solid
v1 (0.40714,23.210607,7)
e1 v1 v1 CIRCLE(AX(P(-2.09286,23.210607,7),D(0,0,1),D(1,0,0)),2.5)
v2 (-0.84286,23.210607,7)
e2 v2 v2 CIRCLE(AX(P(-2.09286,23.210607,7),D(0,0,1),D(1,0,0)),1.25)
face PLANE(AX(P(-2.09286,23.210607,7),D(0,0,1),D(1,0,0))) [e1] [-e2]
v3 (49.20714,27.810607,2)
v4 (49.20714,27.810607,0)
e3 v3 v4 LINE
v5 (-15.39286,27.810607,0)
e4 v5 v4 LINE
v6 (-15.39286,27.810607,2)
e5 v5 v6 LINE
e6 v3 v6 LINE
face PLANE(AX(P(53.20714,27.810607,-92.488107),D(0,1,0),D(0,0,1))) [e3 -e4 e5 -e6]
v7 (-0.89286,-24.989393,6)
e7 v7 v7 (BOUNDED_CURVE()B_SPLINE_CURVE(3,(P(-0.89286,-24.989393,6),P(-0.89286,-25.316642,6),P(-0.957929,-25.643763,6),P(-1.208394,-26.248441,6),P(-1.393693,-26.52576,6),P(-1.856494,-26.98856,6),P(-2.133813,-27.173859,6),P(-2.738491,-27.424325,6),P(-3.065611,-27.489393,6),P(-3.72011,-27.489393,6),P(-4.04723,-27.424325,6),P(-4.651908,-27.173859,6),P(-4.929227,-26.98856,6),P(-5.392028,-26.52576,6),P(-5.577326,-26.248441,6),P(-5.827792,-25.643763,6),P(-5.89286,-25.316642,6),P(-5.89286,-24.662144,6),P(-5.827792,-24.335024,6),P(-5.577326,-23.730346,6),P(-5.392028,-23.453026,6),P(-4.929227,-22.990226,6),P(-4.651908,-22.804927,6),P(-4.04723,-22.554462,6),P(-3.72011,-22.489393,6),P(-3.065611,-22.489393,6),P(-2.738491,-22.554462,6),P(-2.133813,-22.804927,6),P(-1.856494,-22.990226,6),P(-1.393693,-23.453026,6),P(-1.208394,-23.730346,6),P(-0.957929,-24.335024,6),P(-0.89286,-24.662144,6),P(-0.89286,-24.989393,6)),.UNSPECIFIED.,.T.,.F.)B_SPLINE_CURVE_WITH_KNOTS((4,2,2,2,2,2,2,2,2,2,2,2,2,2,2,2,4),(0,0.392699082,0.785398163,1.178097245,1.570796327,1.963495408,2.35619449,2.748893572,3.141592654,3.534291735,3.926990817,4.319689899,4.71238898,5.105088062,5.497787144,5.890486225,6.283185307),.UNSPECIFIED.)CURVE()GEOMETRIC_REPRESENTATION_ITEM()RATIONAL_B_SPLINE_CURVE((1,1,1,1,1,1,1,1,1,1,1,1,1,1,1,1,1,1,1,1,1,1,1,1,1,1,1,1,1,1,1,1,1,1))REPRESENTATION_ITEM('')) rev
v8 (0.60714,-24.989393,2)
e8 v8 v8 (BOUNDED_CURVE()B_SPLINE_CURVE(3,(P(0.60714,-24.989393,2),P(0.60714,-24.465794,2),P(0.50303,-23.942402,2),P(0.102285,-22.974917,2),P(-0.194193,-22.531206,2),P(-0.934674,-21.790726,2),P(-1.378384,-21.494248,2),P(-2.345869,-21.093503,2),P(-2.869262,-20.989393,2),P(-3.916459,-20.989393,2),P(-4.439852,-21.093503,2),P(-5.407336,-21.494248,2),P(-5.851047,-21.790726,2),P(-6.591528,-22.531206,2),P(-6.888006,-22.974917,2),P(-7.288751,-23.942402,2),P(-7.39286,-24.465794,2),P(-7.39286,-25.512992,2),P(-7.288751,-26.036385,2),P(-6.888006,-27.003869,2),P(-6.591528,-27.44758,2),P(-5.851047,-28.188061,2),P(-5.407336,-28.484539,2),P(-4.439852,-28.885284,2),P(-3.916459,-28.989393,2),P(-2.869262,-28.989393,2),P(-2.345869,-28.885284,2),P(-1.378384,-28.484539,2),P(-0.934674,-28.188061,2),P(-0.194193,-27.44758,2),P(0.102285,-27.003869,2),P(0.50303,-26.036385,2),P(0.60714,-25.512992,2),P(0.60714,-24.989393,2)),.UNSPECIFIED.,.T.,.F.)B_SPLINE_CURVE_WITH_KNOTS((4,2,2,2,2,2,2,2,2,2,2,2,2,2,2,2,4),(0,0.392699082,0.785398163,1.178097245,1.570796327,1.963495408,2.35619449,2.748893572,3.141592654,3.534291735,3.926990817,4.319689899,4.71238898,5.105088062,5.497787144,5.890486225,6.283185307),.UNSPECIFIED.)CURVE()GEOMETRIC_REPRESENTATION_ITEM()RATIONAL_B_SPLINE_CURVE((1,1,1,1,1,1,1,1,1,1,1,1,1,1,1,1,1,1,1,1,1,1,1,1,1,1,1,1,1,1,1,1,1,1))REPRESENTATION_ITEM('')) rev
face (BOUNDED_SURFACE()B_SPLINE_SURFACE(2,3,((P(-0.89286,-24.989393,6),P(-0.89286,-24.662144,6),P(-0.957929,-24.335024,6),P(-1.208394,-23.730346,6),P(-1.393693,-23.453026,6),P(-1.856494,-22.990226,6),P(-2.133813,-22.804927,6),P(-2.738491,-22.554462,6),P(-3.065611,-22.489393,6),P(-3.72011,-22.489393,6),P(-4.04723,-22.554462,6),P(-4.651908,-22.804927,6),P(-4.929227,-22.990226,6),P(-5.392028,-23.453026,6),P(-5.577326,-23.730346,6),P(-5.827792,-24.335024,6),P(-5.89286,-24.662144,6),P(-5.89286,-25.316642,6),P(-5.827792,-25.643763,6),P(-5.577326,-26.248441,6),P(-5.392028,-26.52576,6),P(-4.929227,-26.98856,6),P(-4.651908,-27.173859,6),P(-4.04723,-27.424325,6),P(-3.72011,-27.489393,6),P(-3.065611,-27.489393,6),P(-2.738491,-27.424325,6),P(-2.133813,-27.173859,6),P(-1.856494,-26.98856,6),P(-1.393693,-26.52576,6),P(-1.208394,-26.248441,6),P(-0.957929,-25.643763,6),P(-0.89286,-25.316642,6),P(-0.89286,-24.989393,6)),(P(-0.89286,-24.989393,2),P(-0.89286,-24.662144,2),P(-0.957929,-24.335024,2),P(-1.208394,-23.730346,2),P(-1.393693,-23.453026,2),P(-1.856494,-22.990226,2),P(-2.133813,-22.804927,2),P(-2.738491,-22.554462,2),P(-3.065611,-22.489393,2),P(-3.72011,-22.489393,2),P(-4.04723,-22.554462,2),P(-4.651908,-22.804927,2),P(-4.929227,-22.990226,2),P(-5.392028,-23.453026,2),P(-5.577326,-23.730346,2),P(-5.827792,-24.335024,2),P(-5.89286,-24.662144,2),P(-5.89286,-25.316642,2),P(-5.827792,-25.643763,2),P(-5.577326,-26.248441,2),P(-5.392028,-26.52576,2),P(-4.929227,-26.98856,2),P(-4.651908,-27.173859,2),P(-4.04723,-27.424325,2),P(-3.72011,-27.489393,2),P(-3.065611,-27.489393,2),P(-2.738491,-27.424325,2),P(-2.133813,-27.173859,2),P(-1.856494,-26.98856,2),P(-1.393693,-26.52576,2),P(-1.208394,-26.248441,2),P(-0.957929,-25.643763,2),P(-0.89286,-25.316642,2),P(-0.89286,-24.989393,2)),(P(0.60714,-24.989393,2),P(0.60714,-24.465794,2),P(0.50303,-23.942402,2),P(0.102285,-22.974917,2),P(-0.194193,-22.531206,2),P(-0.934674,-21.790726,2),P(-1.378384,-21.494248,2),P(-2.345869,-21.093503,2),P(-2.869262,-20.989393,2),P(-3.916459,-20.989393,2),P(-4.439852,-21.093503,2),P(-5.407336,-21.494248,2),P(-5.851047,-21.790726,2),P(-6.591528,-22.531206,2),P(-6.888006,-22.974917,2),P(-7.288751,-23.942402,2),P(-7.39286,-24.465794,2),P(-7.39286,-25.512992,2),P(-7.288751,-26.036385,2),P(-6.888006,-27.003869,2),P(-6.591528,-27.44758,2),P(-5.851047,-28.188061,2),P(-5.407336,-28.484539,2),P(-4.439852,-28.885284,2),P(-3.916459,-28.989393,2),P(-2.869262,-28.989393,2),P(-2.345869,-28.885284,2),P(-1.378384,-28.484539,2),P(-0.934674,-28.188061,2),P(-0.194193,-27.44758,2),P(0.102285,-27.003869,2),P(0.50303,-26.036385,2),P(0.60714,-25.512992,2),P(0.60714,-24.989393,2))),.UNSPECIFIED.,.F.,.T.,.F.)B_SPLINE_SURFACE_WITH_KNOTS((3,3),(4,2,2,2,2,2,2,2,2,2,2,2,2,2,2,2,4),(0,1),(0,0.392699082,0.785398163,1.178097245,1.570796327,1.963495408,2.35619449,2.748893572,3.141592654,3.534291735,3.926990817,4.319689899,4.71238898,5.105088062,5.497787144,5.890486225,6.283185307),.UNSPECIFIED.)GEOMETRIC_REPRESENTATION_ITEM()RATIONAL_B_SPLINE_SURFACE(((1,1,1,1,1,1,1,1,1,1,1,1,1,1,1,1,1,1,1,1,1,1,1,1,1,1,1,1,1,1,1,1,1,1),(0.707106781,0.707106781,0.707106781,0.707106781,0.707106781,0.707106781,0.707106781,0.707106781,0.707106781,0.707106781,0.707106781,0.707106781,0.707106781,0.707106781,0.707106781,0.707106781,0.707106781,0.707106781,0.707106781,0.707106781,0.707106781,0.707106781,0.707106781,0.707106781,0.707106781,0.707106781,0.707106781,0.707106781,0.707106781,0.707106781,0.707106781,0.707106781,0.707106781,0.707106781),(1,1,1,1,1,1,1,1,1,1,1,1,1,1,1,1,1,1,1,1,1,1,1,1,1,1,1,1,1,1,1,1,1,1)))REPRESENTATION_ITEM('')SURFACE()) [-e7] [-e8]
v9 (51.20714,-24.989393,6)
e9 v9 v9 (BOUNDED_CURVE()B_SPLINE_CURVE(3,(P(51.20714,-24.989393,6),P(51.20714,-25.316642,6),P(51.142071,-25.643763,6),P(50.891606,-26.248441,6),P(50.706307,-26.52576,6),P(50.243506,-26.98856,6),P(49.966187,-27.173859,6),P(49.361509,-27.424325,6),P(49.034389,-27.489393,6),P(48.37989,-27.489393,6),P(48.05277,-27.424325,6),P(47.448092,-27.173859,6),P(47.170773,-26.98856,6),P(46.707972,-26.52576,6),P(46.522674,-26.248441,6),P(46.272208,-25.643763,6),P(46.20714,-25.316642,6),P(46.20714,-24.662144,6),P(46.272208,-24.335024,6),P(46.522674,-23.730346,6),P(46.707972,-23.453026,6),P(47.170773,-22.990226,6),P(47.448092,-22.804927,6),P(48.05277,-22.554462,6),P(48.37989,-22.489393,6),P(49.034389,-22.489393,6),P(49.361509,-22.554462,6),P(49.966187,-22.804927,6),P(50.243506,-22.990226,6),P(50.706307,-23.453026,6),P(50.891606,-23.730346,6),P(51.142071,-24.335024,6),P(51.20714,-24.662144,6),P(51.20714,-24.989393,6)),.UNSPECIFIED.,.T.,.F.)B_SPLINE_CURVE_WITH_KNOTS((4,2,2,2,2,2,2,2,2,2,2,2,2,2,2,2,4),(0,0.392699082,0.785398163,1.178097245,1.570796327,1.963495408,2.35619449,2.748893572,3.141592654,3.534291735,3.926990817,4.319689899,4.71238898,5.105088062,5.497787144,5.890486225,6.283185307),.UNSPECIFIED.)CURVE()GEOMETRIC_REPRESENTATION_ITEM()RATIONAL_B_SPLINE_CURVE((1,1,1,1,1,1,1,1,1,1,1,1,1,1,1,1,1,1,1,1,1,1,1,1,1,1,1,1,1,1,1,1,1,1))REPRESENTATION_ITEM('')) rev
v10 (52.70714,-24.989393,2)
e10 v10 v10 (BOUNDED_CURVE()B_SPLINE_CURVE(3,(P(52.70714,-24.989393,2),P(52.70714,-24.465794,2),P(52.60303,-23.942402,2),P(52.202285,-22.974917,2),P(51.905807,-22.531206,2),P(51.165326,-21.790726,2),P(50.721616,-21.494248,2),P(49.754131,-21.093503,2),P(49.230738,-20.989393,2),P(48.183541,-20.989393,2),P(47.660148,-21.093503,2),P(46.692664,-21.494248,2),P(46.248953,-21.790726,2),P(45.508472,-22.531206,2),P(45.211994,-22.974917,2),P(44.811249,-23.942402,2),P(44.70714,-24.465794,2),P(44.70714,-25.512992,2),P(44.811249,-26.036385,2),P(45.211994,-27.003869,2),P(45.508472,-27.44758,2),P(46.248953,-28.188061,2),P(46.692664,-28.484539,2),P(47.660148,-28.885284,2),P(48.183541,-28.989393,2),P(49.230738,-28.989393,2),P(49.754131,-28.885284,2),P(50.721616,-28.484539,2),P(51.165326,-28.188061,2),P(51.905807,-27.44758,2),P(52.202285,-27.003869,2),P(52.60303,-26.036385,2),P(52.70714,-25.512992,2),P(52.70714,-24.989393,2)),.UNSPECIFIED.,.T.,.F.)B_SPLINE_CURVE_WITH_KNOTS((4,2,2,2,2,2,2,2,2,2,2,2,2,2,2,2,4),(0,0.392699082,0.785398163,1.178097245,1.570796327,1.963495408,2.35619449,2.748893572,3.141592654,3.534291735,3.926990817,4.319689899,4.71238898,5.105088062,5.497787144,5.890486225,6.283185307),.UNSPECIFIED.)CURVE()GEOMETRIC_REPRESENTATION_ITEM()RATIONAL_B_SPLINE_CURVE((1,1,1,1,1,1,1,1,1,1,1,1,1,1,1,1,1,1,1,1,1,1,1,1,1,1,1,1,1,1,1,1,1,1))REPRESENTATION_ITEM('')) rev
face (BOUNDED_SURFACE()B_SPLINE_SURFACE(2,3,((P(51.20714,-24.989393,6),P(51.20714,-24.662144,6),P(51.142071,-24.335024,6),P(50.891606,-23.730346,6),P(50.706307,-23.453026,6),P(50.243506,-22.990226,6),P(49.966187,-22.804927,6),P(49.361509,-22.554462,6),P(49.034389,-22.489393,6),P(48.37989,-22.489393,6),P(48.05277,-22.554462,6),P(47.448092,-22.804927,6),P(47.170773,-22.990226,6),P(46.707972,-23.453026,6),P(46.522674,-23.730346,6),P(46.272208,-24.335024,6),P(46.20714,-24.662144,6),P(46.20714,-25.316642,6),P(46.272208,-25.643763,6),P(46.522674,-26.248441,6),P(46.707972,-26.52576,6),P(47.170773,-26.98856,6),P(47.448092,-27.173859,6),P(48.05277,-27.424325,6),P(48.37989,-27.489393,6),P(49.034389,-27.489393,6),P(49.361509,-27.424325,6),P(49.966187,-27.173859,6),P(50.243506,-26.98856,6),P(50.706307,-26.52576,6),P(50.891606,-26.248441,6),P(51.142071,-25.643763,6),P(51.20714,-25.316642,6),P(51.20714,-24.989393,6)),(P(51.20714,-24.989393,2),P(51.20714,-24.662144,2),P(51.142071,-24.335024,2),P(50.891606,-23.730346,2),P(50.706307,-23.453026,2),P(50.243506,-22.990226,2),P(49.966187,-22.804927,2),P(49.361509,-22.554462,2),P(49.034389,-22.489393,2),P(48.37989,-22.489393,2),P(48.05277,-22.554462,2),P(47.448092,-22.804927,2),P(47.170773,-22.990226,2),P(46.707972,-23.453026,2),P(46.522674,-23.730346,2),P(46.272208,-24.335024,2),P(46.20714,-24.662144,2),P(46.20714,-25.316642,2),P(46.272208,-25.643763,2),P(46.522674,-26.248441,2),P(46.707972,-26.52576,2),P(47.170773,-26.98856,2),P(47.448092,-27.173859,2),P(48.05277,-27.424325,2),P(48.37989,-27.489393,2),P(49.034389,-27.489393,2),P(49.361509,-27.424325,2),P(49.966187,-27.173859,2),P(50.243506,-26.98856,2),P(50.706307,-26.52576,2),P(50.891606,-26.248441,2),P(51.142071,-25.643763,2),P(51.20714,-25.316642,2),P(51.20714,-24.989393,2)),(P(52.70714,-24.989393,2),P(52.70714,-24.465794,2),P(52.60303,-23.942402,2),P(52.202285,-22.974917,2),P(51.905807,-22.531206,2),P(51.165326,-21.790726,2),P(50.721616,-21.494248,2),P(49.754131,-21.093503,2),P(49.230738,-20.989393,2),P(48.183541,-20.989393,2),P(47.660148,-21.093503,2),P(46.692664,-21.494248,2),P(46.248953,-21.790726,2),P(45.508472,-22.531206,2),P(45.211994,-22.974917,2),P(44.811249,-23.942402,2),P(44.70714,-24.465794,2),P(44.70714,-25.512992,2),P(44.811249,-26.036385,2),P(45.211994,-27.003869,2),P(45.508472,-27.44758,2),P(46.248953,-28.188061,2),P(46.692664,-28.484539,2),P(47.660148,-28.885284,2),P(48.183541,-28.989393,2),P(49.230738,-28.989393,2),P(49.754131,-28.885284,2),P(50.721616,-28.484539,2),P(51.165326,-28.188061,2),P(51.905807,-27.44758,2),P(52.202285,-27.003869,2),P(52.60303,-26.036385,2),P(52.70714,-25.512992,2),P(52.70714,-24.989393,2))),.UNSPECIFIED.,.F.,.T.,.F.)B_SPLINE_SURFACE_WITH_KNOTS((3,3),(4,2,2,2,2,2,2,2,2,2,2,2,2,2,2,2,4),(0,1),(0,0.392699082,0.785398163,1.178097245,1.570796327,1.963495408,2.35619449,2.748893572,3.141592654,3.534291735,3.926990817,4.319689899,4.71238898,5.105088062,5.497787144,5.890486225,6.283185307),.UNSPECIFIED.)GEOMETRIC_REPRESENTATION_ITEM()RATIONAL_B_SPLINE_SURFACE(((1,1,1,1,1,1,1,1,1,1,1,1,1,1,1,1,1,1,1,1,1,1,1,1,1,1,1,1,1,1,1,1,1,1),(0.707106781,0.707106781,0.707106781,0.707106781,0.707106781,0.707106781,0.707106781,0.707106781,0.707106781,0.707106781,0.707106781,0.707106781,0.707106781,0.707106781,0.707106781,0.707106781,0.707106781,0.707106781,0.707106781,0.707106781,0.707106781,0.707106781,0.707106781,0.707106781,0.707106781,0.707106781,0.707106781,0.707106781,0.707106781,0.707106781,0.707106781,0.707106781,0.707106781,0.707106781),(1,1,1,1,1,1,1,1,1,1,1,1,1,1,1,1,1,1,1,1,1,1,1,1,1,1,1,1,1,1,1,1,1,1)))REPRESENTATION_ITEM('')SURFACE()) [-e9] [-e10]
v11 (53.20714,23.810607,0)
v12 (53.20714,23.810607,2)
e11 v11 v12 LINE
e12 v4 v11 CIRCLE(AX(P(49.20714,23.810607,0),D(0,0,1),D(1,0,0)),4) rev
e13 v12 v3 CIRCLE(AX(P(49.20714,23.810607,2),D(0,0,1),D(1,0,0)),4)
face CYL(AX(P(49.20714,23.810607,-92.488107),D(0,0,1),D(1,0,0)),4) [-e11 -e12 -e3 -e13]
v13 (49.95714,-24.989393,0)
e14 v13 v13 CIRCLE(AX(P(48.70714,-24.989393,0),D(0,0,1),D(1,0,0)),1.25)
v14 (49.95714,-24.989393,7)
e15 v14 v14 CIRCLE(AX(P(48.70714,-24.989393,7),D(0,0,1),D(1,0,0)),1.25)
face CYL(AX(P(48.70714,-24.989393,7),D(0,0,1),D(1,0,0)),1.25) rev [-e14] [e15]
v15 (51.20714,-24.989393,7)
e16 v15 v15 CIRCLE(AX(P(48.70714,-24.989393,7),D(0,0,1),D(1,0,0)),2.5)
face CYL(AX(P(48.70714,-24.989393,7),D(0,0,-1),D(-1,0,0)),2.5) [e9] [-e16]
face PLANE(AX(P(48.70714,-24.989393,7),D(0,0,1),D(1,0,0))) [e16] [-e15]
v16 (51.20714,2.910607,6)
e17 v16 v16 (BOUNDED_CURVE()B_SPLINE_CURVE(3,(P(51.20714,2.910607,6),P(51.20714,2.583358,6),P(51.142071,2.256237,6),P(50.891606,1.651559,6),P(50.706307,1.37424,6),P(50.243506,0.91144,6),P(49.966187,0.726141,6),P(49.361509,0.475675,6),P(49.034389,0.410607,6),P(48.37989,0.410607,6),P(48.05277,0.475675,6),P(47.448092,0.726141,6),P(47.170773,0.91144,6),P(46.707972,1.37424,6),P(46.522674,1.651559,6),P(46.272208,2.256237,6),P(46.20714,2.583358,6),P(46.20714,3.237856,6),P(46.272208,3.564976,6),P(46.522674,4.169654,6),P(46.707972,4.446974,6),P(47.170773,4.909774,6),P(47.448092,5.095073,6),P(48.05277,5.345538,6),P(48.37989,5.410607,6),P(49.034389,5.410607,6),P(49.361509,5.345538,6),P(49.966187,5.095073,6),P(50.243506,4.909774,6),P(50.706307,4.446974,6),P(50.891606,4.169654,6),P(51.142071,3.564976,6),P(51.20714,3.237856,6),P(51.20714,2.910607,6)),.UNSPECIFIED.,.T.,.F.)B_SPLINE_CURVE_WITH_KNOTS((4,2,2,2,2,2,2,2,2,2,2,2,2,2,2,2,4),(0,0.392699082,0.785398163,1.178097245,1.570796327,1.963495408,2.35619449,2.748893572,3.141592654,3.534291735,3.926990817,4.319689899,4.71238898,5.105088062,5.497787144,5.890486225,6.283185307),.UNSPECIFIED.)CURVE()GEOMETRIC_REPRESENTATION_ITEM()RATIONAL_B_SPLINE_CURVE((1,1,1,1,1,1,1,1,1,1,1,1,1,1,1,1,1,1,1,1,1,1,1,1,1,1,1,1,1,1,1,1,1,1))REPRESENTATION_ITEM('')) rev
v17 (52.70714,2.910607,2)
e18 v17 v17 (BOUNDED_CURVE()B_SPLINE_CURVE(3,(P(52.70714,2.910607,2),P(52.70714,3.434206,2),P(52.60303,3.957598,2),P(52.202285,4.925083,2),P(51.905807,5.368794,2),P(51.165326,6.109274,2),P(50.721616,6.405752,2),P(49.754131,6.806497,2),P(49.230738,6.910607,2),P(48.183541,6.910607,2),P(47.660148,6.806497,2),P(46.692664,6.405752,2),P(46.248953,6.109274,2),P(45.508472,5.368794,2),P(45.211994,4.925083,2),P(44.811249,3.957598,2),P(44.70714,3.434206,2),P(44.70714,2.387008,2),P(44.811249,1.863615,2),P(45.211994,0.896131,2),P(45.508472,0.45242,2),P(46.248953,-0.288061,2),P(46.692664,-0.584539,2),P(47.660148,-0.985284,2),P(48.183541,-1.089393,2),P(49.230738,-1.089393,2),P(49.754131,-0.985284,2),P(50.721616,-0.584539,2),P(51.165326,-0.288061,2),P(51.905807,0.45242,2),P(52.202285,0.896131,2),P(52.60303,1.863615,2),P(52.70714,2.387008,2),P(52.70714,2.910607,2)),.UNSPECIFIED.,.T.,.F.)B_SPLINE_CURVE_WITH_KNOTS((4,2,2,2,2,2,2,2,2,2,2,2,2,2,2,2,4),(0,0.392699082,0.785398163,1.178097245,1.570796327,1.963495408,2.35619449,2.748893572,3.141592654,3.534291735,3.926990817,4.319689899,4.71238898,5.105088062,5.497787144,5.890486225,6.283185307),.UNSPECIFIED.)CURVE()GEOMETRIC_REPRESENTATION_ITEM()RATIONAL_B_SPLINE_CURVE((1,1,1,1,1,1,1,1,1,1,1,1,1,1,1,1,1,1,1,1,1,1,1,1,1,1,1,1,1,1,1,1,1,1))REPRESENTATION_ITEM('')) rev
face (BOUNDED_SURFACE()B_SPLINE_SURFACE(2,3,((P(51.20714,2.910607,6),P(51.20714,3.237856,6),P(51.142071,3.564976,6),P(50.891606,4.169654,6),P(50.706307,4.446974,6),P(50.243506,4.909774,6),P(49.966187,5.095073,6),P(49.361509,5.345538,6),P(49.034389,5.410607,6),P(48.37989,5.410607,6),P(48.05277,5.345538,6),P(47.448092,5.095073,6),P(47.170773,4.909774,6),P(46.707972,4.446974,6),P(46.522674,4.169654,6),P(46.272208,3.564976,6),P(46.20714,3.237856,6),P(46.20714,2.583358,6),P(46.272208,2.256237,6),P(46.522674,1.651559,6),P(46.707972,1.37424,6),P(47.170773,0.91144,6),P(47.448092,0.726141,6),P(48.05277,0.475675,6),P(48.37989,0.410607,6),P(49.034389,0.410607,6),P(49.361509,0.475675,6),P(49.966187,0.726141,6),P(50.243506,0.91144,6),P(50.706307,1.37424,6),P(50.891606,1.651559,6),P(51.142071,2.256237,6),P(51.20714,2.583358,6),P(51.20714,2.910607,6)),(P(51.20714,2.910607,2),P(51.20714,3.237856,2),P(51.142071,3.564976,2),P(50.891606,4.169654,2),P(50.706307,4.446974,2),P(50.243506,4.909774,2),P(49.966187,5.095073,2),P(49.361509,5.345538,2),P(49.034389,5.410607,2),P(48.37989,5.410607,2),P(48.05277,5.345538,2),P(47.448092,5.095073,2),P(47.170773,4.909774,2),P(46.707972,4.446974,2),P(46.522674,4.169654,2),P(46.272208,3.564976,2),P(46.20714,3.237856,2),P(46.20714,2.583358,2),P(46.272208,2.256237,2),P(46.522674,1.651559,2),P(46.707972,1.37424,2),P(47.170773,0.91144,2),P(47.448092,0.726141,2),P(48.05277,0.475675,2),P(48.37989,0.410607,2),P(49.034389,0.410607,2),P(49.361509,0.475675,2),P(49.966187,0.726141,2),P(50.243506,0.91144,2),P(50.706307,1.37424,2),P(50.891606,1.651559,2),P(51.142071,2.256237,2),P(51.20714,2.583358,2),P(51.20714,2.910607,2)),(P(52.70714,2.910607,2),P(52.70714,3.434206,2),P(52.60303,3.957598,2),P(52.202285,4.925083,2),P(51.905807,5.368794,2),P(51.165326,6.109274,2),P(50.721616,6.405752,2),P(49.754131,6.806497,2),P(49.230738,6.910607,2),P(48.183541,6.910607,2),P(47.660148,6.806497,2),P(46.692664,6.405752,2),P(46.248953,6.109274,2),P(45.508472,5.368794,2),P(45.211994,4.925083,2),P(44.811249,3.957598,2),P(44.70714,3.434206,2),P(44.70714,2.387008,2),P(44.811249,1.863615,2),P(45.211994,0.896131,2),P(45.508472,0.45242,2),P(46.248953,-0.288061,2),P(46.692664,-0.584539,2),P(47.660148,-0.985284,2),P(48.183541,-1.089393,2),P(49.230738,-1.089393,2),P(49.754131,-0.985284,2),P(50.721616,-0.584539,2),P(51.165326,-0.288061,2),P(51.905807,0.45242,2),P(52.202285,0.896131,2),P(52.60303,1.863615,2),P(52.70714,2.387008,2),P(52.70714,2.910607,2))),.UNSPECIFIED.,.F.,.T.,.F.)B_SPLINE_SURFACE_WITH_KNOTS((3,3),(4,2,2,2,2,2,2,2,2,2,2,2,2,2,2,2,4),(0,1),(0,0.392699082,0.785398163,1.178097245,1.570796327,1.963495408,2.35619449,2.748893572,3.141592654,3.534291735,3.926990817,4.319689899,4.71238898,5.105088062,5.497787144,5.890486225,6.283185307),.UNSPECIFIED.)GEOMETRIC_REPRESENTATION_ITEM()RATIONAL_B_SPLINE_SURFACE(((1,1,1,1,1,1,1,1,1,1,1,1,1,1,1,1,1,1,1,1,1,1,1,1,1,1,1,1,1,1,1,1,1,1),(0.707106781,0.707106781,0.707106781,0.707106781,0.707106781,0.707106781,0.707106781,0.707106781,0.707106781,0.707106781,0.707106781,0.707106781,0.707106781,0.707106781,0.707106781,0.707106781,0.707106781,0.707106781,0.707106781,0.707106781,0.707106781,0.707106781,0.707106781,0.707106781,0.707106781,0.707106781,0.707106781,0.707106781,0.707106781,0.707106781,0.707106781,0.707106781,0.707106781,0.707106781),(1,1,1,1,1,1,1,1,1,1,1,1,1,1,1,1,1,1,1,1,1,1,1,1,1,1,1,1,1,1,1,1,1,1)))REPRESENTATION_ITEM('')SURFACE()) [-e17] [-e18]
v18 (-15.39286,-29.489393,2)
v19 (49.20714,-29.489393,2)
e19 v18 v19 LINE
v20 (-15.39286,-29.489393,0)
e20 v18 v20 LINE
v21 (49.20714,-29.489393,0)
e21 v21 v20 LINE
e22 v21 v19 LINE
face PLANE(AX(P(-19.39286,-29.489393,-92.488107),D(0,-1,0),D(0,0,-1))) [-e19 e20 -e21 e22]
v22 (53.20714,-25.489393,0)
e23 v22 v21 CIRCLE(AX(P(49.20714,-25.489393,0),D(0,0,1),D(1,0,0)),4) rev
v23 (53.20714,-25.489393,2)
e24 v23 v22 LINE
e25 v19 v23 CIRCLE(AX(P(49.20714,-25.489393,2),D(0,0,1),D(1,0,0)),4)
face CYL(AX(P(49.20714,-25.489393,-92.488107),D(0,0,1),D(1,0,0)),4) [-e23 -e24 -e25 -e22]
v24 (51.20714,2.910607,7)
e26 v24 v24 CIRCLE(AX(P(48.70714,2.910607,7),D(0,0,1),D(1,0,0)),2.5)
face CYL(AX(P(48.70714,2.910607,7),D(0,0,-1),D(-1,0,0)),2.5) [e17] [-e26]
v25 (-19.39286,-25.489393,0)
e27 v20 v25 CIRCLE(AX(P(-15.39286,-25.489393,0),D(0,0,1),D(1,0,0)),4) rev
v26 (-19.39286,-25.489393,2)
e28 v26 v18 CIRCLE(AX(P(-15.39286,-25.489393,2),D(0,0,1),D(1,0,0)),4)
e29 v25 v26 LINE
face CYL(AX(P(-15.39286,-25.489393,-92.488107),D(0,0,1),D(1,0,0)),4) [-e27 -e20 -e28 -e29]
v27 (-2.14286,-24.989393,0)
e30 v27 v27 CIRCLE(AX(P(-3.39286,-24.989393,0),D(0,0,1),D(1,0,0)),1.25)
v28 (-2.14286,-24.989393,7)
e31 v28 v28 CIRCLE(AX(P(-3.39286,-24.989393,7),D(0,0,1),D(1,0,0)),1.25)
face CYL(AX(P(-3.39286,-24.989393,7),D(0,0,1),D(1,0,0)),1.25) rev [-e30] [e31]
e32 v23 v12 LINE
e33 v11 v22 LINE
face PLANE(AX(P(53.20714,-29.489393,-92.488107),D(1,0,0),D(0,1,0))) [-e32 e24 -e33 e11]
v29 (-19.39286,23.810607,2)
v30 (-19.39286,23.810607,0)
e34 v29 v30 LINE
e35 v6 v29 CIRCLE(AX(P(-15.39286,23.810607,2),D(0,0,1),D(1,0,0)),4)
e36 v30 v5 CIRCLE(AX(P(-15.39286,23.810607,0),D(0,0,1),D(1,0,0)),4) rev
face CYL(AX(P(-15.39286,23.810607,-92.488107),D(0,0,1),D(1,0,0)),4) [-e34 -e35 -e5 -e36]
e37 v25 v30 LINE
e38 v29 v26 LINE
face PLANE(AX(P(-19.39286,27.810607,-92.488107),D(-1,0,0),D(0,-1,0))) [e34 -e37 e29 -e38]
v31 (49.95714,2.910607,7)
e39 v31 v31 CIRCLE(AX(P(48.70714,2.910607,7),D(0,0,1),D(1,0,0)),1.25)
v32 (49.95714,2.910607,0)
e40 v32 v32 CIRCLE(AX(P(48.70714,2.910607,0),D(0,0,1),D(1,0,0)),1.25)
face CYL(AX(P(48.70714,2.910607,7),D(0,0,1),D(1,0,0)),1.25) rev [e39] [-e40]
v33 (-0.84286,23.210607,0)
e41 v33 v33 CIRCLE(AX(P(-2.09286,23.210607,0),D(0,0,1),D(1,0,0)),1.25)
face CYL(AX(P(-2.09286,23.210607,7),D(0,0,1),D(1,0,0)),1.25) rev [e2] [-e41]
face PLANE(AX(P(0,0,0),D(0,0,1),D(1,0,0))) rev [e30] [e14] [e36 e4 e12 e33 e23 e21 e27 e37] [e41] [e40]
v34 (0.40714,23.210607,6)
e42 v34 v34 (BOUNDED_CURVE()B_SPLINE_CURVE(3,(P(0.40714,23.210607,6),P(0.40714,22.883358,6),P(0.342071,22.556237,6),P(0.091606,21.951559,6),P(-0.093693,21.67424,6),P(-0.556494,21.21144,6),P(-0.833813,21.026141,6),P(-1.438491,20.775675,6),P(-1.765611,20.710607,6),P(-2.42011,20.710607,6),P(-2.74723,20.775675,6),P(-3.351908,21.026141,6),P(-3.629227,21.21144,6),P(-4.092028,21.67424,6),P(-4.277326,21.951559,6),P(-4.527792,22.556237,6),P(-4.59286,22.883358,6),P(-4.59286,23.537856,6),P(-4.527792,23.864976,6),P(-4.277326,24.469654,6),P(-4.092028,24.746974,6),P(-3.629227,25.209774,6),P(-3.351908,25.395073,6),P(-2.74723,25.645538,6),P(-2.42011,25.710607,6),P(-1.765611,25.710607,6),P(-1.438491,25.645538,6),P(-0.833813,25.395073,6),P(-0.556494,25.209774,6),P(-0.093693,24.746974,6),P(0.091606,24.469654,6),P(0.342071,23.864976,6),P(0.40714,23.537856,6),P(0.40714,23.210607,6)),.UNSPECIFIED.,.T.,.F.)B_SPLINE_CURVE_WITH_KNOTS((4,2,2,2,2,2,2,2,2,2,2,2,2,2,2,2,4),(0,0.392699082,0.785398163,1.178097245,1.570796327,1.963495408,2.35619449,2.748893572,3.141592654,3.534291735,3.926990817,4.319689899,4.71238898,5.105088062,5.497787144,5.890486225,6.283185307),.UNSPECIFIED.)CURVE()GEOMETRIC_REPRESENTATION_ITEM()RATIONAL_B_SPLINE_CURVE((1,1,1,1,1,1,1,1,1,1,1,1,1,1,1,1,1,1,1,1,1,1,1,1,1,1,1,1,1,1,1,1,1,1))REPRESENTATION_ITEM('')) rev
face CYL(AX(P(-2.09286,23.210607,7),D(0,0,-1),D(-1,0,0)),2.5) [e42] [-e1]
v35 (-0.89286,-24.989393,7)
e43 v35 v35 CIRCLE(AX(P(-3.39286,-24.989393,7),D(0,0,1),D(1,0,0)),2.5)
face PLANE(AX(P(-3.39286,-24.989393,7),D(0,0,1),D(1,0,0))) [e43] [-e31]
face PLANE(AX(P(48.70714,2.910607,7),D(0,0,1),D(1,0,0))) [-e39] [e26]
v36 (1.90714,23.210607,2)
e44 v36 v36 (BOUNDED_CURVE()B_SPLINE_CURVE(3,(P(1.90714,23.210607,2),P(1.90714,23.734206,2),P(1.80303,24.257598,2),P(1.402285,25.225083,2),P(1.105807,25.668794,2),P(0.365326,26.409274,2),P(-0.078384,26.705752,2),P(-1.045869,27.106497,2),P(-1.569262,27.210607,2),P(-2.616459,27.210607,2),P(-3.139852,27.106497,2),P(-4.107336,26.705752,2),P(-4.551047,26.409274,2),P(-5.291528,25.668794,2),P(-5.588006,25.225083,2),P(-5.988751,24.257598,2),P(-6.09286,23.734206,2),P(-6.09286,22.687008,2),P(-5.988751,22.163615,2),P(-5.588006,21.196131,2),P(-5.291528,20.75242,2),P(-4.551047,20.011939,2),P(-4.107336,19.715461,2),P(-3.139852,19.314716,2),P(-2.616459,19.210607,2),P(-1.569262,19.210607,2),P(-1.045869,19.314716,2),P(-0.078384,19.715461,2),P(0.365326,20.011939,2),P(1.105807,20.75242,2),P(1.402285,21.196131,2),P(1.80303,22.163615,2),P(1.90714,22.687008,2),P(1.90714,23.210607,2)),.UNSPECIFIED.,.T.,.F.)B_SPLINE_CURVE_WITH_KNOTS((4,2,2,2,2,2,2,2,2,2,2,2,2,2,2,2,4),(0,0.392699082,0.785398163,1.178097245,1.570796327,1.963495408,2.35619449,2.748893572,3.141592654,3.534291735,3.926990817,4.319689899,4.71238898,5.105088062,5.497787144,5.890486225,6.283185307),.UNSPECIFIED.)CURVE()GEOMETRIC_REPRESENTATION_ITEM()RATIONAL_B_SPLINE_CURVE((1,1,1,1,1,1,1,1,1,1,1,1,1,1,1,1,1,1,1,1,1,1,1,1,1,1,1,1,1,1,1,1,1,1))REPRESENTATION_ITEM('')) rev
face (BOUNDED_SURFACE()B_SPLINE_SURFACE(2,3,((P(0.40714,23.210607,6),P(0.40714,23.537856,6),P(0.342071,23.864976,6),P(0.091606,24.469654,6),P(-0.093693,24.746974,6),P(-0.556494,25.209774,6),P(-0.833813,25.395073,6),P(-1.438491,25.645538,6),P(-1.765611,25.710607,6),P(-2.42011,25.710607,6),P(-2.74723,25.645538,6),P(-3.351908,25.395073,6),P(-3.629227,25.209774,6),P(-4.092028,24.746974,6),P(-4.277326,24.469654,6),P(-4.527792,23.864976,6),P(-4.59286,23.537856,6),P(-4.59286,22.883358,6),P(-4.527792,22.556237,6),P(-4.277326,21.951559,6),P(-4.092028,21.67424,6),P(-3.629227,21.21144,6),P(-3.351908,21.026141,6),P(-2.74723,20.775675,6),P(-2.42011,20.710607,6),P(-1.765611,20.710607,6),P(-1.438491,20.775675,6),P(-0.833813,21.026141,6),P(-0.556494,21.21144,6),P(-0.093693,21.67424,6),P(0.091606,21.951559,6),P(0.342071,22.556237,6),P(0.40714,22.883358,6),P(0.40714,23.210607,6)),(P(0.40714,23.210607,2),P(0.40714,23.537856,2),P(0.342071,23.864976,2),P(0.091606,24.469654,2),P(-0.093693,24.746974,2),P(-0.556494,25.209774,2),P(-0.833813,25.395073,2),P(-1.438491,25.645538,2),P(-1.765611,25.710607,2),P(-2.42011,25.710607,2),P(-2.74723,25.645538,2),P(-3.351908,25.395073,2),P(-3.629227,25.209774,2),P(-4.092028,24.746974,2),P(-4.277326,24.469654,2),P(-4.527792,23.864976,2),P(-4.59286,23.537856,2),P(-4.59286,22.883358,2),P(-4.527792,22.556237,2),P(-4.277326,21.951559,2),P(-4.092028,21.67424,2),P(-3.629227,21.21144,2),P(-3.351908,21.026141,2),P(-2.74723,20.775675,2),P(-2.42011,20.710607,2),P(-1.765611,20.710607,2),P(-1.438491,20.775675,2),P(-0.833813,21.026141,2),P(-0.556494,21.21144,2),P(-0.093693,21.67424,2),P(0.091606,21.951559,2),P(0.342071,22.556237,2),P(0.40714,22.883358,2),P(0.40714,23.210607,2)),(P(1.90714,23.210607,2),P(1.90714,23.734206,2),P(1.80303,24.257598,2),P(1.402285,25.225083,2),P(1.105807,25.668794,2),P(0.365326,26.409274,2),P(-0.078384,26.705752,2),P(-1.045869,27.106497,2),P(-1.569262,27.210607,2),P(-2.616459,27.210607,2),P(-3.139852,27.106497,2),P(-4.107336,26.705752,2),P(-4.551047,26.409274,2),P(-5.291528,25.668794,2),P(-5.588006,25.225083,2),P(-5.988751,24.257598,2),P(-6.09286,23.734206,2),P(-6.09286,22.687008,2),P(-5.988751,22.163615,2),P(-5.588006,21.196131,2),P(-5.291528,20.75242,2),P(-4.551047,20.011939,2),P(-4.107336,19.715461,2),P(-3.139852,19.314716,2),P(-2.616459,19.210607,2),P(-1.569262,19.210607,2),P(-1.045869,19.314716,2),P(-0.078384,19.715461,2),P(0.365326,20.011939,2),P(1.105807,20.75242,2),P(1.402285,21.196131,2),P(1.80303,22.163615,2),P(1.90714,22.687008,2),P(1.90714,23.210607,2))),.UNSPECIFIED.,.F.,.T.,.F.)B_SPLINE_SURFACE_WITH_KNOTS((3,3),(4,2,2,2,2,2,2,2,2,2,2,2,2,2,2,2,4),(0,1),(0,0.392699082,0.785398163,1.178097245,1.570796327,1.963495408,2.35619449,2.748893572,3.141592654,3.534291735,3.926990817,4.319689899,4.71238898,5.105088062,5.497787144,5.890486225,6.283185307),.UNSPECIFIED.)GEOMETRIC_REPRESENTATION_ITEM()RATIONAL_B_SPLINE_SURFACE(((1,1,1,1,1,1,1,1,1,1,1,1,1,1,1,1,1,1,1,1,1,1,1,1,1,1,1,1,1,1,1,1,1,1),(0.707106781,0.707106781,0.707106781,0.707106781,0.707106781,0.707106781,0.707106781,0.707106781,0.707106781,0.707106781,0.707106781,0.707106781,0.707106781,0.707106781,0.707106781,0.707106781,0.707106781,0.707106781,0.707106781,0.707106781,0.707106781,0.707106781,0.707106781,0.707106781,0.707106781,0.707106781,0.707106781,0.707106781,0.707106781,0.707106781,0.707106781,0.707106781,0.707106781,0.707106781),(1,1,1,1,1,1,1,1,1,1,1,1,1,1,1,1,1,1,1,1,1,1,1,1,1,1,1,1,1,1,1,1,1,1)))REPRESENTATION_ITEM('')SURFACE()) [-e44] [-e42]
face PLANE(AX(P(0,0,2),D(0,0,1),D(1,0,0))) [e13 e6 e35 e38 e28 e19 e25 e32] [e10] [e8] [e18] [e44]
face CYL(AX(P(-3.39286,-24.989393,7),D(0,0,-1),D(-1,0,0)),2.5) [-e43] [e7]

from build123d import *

# Parameters (mm, degrees)
SKETCH1_W           = 68.6
SKETCH1_H           = 53.3
BOSS_EXTRUDE1_DEPTH = 2
SKETCH6_W           = 72.6
SKETCH6_H           = 57.3
BOSS_EXTRUDE3_DEPTH = 2
SKETCH3_R           = 2.5
BOSS_EXTRUDE2_DEPTH = 5
FILLET1_SIZE        = 1.5
FILLET1_SIZE_2      = 4
FILLET2_R           = 4


with BuildPart() as part:
    # Sketch1 → Boss-Extrude1 (new body)
    with BuildSketch(Plane.XY):
        with Locations((16.907139599, -0.839393248)):
            Rectangle(SKETCH1_W, SKETCH1_H)
    extrude(amount=BOSS_EXTRUDE1_DEPTH)

    # Sketch6 → Boss-Extrude3 (add)
    with BuildSketch(Plane.XY.offset(2)):
        with Locations((16.907139599, -0.839393248)):
            Rectangle(SKETCH6_W, SKETCH6_H)
    extrude(amount=-BOSS_EXTRUDE3_DEPTH)

    # Sketch3 → Boss-Extrude2 (add)
    with BuildSketch(Plane.XY.offset(2)):
        with Locations((-2.092860401, 23.210606752)):
            Circle(SKETCH3_R)
    boss_extrude2 = extrude(amount=BOSS_EXTRUDE2_DEPTH)

    # Sketch5 → Tap Drill for M3x0.5 Tap1 (revolve, cut)
    with BuildSketch(Plane(origin=(-2.092860401, 23.210606752, 7), x_dir=(0, -1, 0), z_dir=(1, 0, 0))):
        Polygon((0, 0), (0, 10.751075774), (1.25, 10), (1.25, 0), align=None)
    tap_drill_for_m3x0_5_tap1 = revolve(axis=Axis((-2.092860401, 23.210606752, 13.35), (0, 0, -1)), mode=Mode.SUBTRACT)

    # Sketch-Pattern1: Boss-Extrude2, Tap Drill for M3x0.5 Tap1 at 3 more places
    with Locations((50.8, -48.2, 0), (-1.3, -48.2, 0), (50.8, -20.3, 0)):
        add(boss_extrude2)
        add(tap_drill_for_m3x0_5_tap1, mode=Mode.SUBTRACT)

    # Fillet1
    # an asymmetric fillet: 4, 1.5 mm, written as the material it adds along each edge
    with BuildSketch(Plane(origin=(-2.092860401, 23.210606752, 2), x_dir=(1, 0, 0), z_dir=(0, -1, 0))) as fillet1_piece_1:
        with BuildLine():
            Bezier((2.5 + FILLET1_SIZE, 0), (2.5, 0), (2.5, FILLET1_SIZE_2), weights=[1, 0.707106781, 1])
            Line((2.5, FILLET1_SIZE_2), (2.5, 0))
            Line((2.5, 0), (2.5 + FILLET1_SIZE, 0))
        make_face()
    revolve(axis=Axis((-2.092860401, 23.210606752, 2), (0, 0, 1)))
    with BuildSketch(Plane(origin=(48.707139599, -24.989393248, 2), x_dir=(1, 0, 0), z_dir=(0, -1, 0))) as fillet1_piece_2:
        with BuildLine():
            Bezier((2.5 + FILLET1_SIZE, 0), (2.5, 0), (2.5, FILLET1_SIZE_2), weights=[1, 0.707106781, 1])
            Line((2.5, FILLET1_SIZE_2), (2.5, 0))
            Line((2.5, 0), (2.5 + FILLET1_SIZE, 0))
        make_face()
    revolve(axis=Axis((48.707139599, -24.989393248, 2), (0, 0, 1)))
    with BuildSketch(Plane(origin=(-3.392860401, -24.989393248, 2), x_dir=(1, 0, 0), z_dir=(0, -1, 0))) as fillet1_piece_3:
        with BuildLine():
            Bezier((2.5 + FILLET1_SIZE, 0), (2.5, 0), (2.5, FILLET1_SIZE_2), weights=[1, 0.707106781, 1])
            Line((2.5, FILLET1_SIZE_2), (2.5, 0))
            Line((2.5, 0), (2.5 + FILLET1_SIZE, 0))
        make_face()
    revolve(axis=Axis((-3.392860401, -24.989393248, 2), (0, 0, 1)))
    with BuildSketch(Plane(origin=(48.707139599, 2.910606752, 2), x_dir=(1, 0, 0), z_dir=(0, -1, 0))) as fillet1_piece_4:
        with BuildLine():
            Bezier((2.5 + FILLET1_SIZE, 0), (2.5, 0), (2.5, FILLET1_SIZE_2), weights=[1, 0.707106781, 1])
            Line((2.5, FILLET1_SIZE_2), (2.5, 0))
            Line((2.5, 0), (2.5 + FILLET1_SIZE, 0))
        make_face()
    revolve(axis=Axis((48.707139599, 2.910606752, 2), (0, 0, 1)))

    # Fillet2
    fillet2_edges = [part.edges().sort_by_distance(p)[0] for p in [
        (-19.392860401, 27.810606752, 1),
        (53.207139599, 27.810606752, 1),
        (53.207139599, -29.489393248, 1),
        (-19.392860401, -29.489393248, 1),
    ]]
    fillet(fillet2_edges, radius=FILLET2_R)


solid = part.part
